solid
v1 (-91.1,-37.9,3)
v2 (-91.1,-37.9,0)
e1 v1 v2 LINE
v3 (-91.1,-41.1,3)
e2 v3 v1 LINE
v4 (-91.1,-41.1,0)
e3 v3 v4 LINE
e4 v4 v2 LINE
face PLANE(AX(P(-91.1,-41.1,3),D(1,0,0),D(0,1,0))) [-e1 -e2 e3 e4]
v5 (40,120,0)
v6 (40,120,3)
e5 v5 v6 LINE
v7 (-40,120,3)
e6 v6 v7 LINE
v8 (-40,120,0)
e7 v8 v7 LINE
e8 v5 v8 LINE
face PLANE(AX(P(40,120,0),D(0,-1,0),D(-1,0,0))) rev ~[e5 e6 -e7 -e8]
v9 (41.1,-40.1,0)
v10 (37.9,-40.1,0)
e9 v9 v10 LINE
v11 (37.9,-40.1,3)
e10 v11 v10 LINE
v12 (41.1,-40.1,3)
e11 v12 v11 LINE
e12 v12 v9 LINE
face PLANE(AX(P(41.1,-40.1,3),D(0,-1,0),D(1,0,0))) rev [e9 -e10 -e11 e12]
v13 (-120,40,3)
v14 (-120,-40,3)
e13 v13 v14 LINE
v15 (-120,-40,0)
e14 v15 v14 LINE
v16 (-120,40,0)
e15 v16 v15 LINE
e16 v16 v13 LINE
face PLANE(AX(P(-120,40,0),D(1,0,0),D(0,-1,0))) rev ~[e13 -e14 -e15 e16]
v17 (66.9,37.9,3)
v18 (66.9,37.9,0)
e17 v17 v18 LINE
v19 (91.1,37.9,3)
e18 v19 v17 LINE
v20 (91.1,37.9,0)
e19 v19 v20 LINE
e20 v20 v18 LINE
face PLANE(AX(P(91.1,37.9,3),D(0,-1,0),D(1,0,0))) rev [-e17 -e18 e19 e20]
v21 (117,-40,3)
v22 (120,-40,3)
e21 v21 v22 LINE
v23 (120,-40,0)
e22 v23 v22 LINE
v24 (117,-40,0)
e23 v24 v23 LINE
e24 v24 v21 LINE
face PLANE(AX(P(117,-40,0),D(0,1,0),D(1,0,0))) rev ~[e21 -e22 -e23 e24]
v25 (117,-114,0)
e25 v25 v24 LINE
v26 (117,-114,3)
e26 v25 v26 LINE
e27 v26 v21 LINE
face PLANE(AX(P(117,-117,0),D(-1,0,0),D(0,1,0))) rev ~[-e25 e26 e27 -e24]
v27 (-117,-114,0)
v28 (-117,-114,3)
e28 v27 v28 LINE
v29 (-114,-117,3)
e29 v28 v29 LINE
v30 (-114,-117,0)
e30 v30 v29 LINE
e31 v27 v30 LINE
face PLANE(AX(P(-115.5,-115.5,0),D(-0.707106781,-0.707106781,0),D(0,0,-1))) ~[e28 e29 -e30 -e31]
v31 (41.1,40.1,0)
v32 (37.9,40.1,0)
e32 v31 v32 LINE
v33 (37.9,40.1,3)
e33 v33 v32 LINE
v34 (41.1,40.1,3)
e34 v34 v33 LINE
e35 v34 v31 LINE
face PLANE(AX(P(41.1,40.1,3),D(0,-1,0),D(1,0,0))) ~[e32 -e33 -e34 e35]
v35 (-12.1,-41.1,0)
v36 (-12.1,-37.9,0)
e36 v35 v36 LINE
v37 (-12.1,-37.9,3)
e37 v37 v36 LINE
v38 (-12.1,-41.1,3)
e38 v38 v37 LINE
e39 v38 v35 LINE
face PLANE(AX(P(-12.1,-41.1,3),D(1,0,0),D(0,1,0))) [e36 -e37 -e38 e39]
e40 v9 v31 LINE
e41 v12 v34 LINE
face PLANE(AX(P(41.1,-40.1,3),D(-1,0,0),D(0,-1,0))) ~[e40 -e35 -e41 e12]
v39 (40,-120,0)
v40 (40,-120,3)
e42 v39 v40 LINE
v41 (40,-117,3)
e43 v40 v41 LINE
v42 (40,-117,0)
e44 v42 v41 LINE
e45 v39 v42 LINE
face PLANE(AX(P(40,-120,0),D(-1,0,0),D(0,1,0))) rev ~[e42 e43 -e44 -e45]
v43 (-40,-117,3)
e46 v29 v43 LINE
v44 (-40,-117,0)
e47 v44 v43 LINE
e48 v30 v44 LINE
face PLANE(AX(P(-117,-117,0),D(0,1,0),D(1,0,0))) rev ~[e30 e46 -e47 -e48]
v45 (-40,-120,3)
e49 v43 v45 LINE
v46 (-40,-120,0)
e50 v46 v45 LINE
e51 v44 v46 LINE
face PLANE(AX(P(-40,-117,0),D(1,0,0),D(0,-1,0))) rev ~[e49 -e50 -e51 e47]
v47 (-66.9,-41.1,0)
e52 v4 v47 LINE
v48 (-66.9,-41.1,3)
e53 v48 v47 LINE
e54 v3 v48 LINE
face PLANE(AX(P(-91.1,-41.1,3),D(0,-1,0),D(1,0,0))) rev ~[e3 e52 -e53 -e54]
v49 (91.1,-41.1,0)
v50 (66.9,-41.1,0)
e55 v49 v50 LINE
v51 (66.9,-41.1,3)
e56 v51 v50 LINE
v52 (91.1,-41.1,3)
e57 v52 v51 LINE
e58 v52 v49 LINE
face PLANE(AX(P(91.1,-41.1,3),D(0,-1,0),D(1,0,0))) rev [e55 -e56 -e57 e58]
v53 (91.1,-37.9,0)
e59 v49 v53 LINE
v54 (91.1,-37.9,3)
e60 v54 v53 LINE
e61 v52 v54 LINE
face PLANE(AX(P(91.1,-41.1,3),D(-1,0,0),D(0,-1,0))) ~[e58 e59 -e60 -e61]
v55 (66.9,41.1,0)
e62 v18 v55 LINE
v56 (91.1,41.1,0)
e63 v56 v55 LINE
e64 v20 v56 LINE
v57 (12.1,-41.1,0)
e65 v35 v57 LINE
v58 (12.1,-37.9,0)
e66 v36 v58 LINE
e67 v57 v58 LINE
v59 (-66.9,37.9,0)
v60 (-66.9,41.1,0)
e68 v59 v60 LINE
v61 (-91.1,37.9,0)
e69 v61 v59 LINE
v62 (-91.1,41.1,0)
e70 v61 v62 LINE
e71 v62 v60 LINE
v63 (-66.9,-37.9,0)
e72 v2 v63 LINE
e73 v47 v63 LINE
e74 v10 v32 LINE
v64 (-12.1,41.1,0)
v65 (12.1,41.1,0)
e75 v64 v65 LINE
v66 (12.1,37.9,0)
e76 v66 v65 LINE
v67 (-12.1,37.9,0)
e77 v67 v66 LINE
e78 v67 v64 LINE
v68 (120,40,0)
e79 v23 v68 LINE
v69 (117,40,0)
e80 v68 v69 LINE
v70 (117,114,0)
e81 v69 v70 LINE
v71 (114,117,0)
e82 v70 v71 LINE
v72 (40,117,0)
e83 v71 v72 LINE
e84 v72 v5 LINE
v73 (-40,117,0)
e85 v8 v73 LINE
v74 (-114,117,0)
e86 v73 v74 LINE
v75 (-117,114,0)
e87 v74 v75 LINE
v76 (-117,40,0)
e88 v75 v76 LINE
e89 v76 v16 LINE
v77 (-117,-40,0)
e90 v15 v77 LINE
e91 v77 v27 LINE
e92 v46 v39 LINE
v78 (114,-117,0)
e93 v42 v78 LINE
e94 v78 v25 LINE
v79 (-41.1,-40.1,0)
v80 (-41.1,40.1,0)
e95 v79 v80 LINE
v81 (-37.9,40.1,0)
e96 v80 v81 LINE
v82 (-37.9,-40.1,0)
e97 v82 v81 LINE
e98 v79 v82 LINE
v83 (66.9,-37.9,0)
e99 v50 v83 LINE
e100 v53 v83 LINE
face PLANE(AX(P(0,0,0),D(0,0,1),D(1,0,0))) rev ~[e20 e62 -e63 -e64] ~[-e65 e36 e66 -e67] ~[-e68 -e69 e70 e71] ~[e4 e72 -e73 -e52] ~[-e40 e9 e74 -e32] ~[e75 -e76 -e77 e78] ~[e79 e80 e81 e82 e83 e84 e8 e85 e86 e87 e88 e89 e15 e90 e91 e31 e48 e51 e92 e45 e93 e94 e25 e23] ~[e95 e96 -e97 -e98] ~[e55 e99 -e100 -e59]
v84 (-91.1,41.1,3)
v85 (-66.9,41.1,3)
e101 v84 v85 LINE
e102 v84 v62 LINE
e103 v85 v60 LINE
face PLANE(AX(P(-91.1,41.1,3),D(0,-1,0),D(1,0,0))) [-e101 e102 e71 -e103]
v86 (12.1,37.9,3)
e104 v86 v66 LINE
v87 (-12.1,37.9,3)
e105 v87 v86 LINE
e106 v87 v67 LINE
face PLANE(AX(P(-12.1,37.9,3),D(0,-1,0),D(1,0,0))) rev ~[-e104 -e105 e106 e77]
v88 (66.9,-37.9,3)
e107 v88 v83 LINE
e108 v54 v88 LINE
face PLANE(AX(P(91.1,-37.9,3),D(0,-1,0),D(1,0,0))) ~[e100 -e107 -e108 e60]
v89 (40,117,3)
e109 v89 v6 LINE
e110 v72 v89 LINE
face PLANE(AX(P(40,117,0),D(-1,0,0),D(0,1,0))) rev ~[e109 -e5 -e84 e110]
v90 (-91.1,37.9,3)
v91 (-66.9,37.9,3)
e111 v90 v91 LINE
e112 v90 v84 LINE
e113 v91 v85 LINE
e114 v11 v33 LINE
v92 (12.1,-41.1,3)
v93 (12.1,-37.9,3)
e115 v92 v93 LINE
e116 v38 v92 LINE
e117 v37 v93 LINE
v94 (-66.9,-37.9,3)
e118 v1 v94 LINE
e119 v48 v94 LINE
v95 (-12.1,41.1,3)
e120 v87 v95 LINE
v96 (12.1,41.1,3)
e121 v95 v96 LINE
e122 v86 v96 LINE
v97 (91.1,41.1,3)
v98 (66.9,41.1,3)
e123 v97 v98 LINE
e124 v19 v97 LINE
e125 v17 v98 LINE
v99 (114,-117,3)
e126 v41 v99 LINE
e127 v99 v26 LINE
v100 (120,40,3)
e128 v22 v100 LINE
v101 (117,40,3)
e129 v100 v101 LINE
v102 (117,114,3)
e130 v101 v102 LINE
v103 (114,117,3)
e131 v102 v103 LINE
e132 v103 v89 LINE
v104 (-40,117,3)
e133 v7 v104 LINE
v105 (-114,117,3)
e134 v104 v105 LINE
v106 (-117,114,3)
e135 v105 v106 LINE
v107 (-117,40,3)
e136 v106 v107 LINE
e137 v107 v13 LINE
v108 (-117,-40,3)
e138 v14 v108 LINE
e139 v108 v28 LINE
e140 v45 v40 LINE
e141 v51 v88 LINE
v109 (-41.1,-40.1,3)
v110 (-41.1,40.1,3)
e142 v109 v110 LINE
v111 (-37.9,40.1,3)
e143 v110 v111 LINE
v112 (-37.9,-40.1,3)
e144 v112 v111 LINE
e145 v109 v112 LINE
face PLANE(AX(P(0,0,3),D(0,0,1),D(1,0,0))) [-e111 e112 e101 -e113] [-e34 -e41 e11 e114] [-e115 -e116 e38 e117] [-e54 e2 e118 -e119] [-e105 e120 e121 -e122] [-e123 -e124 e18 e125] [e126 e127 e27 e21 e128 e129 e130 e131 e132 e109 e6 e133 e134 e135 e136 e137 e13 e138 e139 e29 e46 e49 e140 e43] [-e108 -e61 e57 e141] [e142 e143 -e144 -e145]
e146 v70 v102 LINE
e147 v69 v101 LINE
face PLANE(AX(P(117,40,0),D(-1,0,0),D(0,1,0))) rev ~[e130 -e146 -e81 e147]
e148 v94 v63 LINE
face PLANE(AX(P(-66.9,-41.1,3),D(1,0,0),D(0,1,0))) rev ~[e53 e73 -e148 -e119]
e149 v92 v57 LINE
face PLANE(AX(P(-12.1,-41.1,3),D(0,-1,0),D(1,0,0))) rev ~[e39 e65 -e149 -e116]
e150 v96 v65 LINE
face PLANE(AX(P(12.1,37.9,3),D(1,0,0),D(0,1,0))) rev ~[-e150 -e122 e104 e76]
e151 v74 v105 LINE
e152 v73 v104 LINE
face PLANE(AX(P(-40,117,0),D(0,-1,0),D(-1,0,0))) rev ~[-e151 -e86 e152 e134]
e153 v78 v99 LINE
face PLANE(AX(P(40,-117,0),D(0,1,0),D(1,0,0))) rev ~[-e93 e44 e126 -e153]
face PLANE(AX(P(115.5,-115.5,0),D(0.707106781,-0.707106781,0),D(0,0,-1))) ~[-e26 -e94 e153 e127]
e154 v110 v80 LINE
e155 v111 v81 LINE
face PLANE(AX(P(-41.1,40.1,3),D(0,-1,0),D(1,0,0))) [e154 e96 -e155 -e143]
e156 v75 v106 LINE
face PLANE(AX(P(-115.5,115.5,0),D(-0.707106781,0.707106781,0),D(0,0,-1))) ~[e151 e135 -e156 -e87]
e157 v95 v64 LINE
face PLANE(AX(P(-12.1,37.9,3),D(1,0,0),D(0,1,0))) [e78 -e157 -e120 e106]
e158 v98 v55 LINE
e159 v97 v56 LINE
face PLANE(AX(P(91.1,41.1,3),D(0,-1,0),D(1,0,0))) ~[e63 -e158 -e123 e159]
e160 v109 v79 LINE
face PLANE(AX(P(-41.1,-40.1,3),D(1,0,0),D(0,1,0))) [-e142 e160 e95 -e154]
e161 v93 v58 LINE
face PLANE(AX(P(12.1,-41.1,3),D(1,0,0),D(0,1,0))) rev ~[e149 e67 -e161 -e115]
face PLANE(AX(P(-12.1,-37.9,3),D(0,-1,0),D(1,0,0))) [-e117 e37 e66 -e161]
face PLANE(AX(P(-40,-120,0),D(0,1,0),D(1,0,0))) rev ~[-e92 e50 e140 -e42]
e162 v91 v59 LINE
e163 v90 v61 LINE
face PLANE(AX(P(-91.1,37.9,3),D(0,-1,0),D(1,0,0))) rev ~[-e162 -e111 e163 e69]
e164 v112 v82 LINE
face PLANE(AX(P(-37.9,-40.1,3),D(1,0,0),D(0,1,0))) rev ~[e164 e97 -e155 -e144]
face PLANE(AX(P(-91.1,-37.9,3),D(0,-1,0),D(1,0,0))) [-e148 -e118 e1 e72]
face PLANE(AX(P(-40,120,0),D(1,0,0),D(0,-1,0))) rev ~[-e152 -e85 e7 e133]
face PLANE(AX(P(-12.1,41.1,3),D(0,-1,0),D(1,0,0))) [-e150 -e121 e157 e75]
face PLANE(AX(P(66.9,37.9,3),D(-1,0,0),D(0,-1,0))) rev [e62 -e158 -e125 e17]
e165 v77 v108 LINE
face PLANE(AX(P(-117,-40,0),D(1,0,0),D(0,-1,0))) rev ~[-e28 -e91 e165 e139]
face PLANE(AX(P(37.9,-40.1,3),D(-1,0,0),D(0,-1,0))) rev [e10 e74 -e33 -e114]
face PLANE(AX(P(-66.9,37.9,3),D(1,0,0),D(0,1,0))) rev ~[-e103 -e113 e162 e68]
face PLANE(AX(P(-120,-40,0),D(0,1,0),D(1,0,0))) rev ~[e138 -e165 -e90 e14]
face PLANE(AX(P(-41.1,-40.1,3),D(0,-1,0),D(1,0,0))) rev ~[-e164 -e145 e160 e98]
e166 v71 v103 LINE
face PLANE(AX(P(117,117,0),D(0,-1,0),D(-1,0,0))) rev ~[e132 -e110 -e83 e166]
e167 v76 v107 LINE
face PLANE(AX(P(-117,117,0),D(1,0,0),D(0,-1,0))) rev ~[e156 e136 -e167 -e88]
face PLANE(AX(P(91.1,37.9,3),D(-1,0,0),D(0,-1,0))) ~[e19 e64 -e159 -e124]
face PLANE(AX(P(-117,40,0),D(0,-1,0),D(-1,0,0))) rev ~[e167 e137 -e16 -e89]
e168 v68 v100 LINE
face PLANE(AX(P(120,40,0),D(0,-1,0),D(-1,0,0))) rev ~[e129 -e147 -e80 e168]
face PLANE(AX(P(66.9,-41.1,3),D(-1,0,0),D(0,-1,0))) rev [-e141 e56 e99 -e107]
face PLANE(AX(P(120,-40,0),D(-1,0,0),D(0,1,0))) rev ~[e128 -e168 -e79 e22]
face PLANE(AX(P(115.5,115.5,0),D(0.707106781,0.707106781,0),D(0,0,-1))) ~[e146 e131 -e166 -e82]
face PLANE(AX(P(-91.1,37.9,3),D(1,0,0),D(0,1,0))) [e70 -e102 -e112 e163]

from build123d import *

# Parameters (mm, degrees)
F1_DEPTH = 3
F2_SIZE  = 3
F3_W     = 3.2
F3_H     = 80.2
F4_DEPTH = 3.001
F5_W     = 24.2
F5_H     = 3.2
F6_DEPTH = 3.001
F7_W     = 24.2
F7_H     = 3.2
F8_DEPTH = 3.001


# Not quite as in the source:
# - a pattern or mirror of a feature is missing from the dataset's text; its kind, count and spacing are read off the source's solid


with BuildPart() as f1:
    # F0 (on Top) → F1 (new body)
    with BuildSketch(Plane.XY):
        Polygon((117, 40), (117, 117), (40, 117), (40, 120), (-40, 120), (-40, 117), (-117, 117), (-117, 40), (-120, 40), (-120, -40), (-117, -40), (-117, -117), (-40, -117), (-40, -120), (40, -120), (40, -117), (117, -117), (117, -40), (120, -40), (120, 40), align=None)
    extrude(amount=F1_DEPTH)

    # F2
    f2_edges = [f1.edges().sort_by_distance(p)[0] for p in [
        (117, -117, 1.5),
        (-117, 117, 1.5),
        (117, 117, 1.5),
        (-117, -117, 1.5),
    ]]
    chamfer(f2_edges, length=F2_SIZE)

    # F3 (on face) → F4 (cut, through all)
    with BuildSketch(Plane.XY.offset(3)):
        with Locations((-39.5, 0)):
            Rectangle(F3_W, F3_H)
    f4 = extrude(amount=-F4_DEPTH, mode=Mode.SUBTRACT)

    # F4_copies: F4 across plane
    add(f4.mirror(Plane(origin=(0, 0, 0), x_dir=(0, 0, 1), z_dir=(1, 0, 0))), mode=Mode.SUBTRACT)

    # F5 (on face) → F6 (cut, through all)
    with BuildSketch(Plane.XY.offset(3)):
        with Locations((-79, 39.5)):
            Rectangle(F5_W, F5_H)
        with Locations((-79, -39.5)):
            Rectangle(F5_W, F5_H)
    f6 = extrude(amount=-F6_DEPTH, mode=Mode.SUBTRACT)

    # F6_copies: F6 across plane
    add(f6.mirror(Plane(origin=(0, 0, 0), x_dir=(0, 0, 1), z_dir=(1, 0, 0))), mode=Mode.SUBTRACT)

    # F7 (on face) → F8 (cut, through all)
    with BuildSketch(Plane.XY.offset(3)):
        with Locations((0, 39.5)):
            Rectangle(F7_W, F7_H)
        with Locations((0, -39.5)):
            Rectangle(F7_W, F7_H)
    extrude(amount=-F8_DEPTH, mode=Mode.SUBTRACT)


solid = f1.part
